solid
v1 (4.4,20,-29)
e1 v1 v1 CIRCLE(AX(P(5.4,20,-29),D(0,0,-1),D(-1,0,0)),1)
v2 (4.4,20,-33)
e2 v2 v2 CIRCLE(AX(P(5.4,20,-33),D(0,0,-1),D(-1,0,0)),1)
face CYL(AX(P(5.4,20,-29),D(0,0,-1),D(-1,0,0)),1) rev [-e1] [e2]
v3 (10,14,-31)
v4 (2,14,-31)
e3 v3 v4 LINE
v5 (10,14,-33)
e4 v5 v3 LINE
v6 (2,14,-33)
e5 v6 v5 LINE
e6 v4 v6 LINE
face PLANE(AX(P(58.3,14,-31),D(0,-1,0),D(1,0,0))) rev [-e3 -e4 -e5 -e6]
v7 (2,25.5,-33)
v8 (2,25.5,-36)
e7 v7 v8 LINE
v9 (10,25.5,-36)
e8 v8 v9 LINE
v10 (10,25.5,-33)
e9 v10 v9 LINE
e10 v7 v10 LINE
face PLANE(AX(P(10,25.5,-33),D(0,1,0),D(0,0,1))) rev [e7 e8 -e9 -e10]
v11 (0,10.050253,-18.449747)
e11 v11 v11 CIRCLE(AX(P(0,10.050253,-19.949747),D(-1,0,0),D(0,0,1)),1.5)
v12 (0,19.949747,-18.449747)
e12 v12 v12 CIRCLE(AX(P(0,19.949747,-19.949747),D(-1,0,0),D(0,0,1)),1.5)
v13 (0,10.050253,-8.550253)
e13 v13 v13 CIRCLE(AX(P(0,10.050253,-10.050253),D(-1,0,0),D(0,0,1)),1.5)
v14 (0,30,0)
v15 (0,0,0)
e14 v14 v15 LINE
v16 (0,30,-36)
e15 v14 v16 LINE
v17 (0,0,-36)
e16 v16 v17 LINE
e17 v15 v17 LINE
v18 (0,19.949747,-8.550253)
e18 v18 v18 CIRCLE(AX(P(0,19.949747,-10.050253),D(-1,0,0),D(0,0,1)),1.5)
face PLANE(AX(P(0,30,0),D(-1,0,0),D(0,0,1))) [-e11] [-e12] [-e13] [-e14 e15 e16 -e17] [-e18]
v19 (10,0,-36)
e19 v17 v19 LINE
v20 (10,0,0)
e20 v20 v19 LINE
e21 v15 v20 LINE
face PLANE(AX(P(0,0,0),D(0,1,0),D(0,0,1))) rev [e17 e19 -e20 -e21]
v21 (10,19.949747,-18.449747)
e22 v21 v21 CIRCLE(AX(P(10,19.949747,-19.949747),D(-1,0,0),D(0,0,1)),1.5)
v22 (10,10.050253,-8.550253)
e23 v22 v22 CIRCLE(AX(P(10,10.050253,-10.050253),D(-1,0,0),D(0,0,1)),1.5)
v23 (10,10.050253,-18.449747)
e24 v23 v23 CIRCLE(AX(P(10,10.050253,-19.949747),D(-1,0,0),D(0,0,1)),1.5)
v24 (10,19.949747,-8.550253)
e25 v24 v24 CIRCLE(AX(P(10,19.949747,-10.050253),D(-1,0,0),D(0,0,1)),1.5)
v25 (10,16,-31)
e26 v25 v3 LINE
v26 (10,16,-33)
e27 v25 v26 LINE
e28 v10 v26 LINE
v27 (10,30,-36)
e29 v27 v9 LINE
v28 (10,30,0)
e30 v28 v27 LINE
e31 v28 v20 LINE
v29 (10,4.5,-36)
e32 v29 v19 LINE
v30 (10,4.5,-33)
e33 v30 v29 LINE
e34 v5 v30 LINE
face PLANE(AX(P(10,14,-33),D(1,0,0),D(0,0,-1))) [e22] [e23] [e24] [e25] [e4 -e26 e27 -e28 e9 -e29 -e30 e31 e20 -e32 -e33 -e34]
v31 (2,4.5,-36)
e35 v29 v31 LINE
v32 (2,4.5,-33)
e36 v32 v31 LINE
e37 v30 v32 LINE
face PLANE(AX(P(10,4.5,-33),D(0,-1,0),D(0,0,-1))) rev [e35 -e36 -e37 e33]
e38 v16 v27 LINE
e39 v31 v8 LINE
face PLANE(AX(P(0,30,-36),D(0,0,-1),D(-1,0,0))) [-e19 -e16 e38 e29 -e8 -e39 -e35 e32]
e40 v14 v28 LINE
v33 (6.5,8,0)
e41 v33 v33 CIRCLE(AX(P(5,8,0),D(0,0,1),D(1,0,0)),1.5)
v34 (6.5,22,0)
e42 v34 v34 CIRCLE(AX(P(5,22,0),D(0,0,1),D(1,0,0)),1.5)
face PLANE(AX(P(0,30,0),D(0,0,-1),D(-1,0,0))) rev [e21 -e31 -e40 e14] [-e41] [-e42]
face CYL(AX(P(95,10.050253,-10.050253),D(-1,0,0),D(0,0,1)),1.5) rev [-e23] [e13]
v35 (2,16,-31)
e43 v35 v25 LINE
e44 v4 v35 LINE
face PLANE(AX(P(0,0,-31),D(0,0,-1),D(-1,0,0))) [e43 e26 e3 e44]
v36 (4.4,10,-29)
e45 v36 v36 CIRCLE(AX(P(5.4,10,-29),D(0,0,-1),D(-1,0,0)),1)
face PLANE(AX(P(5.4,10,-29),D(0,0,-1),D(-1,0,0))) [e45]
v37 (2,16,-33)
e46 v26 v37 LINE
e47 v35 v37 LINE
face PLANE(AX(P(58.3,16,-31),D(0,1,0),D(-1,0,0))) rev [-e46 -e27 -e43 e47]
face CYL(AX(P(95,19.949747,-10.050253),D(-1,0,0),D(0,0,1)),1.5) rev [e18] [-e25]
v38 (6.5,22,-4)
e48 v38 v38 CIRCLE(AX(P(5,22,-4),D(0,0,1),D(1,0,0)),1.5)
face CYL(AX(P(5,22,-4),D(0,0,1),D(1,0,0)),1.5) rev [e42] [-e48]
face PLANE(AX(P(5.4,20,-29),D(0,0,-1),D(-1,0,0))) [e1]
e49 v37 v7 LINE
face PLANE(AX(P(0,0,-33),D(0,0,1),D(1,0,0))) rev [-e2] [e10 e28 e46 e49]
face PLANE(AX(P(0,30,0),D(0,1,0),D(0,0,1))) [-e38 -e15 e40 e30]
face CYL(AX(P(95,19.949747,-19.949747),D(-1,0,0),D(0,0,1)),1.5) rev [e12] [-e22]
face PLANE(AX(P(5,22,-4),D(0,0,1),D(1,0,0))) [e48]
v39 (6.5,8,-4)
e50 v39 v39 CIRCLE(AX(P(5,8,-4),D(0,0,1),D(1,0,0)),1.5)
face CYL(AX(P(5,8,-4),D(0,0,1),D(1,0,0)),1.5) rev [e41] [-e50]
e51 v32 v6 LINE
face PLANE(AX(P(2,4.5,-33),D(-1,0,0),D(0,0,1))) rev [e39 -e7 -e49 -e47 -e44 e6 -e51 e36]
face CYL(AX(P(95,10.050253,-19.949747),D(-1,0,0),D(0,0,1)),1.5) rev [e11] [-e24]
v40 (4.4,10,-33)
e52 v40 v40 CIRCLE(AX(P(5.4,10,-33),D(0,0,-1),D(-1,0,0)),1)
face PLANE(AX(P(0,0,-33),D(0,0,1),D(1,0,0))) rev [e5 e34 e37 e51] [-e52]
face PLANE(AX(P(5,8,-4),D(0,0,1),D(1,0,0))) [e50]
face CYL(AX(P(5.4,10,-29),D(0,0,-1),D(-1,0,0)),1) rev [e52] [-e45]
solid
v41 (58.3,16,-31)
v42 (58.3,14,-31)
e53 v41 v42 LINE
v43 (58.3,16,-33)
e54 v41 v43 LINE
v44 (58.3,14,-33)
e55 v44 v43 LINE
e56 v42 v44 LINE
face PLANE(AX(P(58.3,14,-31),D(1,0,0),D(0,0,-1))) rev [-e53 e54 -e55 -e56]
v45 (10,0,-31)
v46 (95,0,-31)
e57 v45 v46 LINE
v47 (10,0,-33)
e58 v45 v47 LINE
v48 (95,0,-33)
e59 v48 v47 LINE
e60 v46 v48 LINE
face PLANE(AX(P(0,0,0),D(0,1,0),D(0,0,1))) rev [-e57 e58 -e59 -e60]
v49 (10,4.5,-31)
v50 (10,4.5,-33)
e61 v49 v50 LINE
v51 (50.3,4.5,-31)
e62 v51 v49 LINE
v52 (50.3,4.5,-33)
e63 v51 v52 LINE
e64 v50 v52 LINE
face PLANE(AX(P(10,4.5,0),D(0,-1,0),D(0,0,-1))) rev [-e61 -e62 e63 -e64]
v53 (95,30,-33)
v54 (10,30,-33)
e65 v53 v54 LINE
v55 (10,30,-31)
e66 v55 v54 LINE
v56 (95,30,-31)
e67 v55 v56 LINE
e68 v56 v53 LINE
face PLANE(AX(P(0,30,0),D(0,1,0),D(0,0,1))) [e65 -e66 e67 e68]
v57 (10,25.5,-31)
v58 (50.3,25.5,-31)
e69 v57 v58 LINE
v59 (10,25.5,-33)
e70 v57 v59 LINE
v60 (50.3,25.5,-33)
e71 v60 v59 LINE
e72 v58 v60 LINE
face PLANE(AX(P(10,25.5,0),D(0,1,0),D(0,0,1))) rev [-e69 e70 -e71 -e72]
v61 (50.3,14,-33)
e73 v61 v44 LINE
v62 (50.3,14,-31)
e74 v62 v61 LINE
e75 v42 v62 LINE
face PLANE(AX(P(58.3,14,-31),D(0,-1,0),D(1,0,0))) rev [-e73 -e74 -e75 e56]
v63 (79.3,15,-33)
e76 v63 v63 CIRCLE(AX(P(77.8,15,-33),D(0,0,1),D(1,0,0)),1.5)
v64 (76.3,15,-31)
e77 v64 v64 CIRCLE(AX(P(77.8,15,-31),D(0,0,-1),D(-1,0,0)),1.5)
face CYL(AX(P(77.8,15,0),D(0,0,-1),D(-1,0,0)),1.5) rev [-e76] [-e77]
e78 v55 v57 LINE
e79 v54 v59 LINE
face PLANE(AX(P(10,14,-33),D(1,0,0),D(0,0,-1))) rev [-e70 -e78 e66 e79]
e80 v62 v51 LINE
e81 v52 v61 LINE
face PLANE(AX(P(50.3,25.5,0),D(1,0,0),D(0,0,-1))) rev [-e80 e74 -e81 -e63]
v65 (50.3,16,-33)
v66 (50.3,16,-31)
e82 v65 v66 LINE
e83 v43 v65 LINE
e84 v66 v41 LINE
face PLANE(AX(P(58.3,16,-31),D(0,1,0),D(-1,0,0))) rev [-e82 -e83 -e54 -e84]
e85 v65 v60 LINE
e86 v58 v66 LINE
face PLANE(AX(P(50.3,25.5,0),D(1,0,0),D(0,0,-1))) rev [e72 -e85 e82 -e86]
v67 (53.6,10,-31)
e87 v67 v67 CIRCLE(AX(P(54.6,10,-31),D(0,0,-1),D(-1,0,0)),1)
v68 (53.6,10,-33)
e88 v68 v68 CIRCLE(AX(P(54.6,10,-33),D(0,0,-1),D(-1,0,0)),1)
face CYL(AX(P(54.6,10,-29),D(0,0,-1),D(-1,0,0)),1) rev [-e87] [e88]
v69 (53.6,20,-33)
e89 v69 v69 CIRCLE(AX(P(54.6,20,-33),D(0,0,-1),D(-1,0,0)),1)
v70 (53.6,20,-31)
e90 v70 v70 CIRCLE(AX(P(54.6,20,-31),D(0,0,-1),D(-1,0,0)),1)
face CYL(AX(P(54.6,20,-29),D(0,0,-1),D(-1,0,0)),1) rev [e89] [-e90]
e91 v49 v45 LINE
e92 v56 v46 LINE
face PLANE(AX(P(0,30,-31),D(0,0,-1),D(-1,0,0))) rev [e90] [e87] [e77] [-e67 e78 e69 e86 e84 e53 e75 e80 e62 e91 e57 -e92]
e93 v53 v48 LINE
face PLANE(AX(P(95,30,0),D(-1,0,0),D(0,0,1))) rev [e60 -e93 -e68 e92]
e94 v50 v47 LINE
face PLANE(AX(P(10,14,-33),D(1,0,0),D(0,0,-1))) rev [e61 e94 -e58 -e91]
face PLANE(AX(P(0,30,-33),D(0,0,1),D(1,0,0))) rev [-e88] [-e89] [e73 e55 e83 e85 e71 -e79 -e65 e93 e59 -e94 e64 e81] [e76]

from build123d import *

# Parameters (mm, degrees)
EXTRUDE_1_DEPTH     = 30
SKETCH_2_R          = 1.5
CUT_EXTRUDE_1_DEPTH = 106.929221653
SKETCH_3_W          = 40.3
SKETCH_3_H          = 21
CUT_EXTRUDE_2_DEPTH = 106.929221653
SKETCH_4_W          = 8
SKETCH_4_H          = 21
CUT_EXTRUDE_3_DEPTH = 3
SKETCH_5_W          = 56.3
SKETCH_5_H          = 2
CUT_EXTRUDE_4_DEPTH = 5
SKETCH_6_R          = 1
CUT_EXTRUDE_5_DEPTH = 4
SKETCH_7_R          = 1.5
CUT_EXTRUDE_6_DEPTH = 106.929221653
SKETCH_8_R          = 1.5
CUT_EXTRUDE_7_DEPTH = 4


with BuildPart() as part:
    # Эскиз1 → Бобышка-Вытянуть1 (new body)
    with BuildSketch(Plane(origin=(0, 0, 0), x_dir=(1, 0, 0), z_dir=(0, 1, 0))):
        Polygon((0, 0), (10, 0), (10, 31), (95, 31), (95, 33), (10, 33), (10, 36), (0, 36), align=None)
    extrude(amount=EXTRUDE_1_DEPTH)

    # Эскиз2 → Вырез-Вытянуть1 (cut, through all)
    with BuildSketch(Plane.ZY):
        with Locations((-19.949747468, 19.949747468)):
            Circle(SKETCH_2_R)
        with Locations((-10.050252532, 19.949747468)):
            Circle(SKETCH_2_R)
        with Locations((-19.949747468, 10.050252532)):
            Circle(SKETCH_2_R)
        with Locations((-10.050252532, 10.050252532)):
            Circle(SKETCH_2_R)
    extrude(amount=-CUT_EXTRUDE_1_DEPTH, mode=Mode.SUBTRACT)

    # Эскиз3 → Вырез-Вытянуть2 (cut, through all)
    with BuildSketch(Plane(origin=(0, 0, -36), x_dir=(-1, 0, 0), z_dir=(0, 0, -1))):
        with Locations((-30.15, 15)):
            Rectangle(SKETCH_3_W, SKETCH_3_H)
    extrude(amount=-CUT_EXTRUDE_2_DEPTH, mode=Mode.SUBTRACT)

    # Эскиз4 → Вырез-Вытянуть3 (cut)
    with BuildSketch(Plane(origin=(0, 0, -36), x_dir=(-1, 0, 0), z_dir=(0, 0, -1))):
        with Locations((-6, 15)):
            Rectangle(SKETCH_4_W, SKETCH_4_H)
    extrude(amount=-CUT_EXTRUDE_3_DEPTH, mode=Mode.SUBTRACT)

    # Эскиз5 → Вырез-Вытянуть4 (cut)
    with BuildSketch(Plane(origin=(0, 0, -36), x_dir=(-1, 0, 0), z_dir=(0, 0, -1))):
        with Locations((-30.15, 15)):
            Rectangle(SKETCH_5_W, SKETCH_5_H)
    extrude(amount=-CUT_EXTRUDE_4_DEPTH, mode=Mode.SUBTRACT)

    # Эскиз6 → Вырез-Вытянуть5 (cut)
    with BuildSketch(Plane(origin=(0, 0, -33), x_dir=(-1, 0, 0), z_dir=(0, 0, -1))):
        with Locations((-5.4, 10)):
            Circle(SKETCH_6_R)
        with Locations((-54.6, 10)):
            Circle(SKETCH_6_R)
        with Locations((-5.4, 20)):
            Circle(SKETCH_6_R)
        with Locations((-54.6, 20)):
            Circle(SKETCH_6_R)
    extrude(amount=-CUT_EXTRUDE_5_DEPTH, mode=Mode.SUBTRACT)

    # Эскиз7 → Вырез-Вытянуть6 (cut, through all)
    with BuildSketch(Plane(origin=(0, 0, -36), x_dir=(-1, 0, 0), z_dir=(0, 0, -1))):
        with Locations((-77.8, 15)):
            Circle(SKETCH_7_R)
    extrude(amount=-CUT_EXTRUDE_6_DEPTH, mode=Mode.SUBTRACT)

    # Эскиз8 → Вырез-Вытянуть7 (cut)
    with BuildSketch(Plane.XY):
        with Locations((5, 22)):
            Circle(SKETCH_8_R)
        with Locations((5, 8)):
            Circle(SKETCH_8_R)
    extrude(amount=-CUT_EXTRUDE_7_DEPTH, mode=Mode.SUBTRACT)


with BuildPart() as body_2:
    # Split Bodies 1: the piece on the far side of the plane
    add(part.part)
    split(bisect_by=Plane(origin=(10, 30, 0), x_dir=(0, 0, -1), z_dir=(-1, 0, 0)), keep=Keep.BOTTOM)


with BuildPart() as part_1:
    add(part.part)

    # Split Bodies 1
    split(bisect_by=Plane(origin=(10, 30, 0), x_dir=(0, 0, -1), z_dir=(-1, 0, 0)), keep=Keep.TOP)


solid = Compound([body_2.part, part_1.part])
